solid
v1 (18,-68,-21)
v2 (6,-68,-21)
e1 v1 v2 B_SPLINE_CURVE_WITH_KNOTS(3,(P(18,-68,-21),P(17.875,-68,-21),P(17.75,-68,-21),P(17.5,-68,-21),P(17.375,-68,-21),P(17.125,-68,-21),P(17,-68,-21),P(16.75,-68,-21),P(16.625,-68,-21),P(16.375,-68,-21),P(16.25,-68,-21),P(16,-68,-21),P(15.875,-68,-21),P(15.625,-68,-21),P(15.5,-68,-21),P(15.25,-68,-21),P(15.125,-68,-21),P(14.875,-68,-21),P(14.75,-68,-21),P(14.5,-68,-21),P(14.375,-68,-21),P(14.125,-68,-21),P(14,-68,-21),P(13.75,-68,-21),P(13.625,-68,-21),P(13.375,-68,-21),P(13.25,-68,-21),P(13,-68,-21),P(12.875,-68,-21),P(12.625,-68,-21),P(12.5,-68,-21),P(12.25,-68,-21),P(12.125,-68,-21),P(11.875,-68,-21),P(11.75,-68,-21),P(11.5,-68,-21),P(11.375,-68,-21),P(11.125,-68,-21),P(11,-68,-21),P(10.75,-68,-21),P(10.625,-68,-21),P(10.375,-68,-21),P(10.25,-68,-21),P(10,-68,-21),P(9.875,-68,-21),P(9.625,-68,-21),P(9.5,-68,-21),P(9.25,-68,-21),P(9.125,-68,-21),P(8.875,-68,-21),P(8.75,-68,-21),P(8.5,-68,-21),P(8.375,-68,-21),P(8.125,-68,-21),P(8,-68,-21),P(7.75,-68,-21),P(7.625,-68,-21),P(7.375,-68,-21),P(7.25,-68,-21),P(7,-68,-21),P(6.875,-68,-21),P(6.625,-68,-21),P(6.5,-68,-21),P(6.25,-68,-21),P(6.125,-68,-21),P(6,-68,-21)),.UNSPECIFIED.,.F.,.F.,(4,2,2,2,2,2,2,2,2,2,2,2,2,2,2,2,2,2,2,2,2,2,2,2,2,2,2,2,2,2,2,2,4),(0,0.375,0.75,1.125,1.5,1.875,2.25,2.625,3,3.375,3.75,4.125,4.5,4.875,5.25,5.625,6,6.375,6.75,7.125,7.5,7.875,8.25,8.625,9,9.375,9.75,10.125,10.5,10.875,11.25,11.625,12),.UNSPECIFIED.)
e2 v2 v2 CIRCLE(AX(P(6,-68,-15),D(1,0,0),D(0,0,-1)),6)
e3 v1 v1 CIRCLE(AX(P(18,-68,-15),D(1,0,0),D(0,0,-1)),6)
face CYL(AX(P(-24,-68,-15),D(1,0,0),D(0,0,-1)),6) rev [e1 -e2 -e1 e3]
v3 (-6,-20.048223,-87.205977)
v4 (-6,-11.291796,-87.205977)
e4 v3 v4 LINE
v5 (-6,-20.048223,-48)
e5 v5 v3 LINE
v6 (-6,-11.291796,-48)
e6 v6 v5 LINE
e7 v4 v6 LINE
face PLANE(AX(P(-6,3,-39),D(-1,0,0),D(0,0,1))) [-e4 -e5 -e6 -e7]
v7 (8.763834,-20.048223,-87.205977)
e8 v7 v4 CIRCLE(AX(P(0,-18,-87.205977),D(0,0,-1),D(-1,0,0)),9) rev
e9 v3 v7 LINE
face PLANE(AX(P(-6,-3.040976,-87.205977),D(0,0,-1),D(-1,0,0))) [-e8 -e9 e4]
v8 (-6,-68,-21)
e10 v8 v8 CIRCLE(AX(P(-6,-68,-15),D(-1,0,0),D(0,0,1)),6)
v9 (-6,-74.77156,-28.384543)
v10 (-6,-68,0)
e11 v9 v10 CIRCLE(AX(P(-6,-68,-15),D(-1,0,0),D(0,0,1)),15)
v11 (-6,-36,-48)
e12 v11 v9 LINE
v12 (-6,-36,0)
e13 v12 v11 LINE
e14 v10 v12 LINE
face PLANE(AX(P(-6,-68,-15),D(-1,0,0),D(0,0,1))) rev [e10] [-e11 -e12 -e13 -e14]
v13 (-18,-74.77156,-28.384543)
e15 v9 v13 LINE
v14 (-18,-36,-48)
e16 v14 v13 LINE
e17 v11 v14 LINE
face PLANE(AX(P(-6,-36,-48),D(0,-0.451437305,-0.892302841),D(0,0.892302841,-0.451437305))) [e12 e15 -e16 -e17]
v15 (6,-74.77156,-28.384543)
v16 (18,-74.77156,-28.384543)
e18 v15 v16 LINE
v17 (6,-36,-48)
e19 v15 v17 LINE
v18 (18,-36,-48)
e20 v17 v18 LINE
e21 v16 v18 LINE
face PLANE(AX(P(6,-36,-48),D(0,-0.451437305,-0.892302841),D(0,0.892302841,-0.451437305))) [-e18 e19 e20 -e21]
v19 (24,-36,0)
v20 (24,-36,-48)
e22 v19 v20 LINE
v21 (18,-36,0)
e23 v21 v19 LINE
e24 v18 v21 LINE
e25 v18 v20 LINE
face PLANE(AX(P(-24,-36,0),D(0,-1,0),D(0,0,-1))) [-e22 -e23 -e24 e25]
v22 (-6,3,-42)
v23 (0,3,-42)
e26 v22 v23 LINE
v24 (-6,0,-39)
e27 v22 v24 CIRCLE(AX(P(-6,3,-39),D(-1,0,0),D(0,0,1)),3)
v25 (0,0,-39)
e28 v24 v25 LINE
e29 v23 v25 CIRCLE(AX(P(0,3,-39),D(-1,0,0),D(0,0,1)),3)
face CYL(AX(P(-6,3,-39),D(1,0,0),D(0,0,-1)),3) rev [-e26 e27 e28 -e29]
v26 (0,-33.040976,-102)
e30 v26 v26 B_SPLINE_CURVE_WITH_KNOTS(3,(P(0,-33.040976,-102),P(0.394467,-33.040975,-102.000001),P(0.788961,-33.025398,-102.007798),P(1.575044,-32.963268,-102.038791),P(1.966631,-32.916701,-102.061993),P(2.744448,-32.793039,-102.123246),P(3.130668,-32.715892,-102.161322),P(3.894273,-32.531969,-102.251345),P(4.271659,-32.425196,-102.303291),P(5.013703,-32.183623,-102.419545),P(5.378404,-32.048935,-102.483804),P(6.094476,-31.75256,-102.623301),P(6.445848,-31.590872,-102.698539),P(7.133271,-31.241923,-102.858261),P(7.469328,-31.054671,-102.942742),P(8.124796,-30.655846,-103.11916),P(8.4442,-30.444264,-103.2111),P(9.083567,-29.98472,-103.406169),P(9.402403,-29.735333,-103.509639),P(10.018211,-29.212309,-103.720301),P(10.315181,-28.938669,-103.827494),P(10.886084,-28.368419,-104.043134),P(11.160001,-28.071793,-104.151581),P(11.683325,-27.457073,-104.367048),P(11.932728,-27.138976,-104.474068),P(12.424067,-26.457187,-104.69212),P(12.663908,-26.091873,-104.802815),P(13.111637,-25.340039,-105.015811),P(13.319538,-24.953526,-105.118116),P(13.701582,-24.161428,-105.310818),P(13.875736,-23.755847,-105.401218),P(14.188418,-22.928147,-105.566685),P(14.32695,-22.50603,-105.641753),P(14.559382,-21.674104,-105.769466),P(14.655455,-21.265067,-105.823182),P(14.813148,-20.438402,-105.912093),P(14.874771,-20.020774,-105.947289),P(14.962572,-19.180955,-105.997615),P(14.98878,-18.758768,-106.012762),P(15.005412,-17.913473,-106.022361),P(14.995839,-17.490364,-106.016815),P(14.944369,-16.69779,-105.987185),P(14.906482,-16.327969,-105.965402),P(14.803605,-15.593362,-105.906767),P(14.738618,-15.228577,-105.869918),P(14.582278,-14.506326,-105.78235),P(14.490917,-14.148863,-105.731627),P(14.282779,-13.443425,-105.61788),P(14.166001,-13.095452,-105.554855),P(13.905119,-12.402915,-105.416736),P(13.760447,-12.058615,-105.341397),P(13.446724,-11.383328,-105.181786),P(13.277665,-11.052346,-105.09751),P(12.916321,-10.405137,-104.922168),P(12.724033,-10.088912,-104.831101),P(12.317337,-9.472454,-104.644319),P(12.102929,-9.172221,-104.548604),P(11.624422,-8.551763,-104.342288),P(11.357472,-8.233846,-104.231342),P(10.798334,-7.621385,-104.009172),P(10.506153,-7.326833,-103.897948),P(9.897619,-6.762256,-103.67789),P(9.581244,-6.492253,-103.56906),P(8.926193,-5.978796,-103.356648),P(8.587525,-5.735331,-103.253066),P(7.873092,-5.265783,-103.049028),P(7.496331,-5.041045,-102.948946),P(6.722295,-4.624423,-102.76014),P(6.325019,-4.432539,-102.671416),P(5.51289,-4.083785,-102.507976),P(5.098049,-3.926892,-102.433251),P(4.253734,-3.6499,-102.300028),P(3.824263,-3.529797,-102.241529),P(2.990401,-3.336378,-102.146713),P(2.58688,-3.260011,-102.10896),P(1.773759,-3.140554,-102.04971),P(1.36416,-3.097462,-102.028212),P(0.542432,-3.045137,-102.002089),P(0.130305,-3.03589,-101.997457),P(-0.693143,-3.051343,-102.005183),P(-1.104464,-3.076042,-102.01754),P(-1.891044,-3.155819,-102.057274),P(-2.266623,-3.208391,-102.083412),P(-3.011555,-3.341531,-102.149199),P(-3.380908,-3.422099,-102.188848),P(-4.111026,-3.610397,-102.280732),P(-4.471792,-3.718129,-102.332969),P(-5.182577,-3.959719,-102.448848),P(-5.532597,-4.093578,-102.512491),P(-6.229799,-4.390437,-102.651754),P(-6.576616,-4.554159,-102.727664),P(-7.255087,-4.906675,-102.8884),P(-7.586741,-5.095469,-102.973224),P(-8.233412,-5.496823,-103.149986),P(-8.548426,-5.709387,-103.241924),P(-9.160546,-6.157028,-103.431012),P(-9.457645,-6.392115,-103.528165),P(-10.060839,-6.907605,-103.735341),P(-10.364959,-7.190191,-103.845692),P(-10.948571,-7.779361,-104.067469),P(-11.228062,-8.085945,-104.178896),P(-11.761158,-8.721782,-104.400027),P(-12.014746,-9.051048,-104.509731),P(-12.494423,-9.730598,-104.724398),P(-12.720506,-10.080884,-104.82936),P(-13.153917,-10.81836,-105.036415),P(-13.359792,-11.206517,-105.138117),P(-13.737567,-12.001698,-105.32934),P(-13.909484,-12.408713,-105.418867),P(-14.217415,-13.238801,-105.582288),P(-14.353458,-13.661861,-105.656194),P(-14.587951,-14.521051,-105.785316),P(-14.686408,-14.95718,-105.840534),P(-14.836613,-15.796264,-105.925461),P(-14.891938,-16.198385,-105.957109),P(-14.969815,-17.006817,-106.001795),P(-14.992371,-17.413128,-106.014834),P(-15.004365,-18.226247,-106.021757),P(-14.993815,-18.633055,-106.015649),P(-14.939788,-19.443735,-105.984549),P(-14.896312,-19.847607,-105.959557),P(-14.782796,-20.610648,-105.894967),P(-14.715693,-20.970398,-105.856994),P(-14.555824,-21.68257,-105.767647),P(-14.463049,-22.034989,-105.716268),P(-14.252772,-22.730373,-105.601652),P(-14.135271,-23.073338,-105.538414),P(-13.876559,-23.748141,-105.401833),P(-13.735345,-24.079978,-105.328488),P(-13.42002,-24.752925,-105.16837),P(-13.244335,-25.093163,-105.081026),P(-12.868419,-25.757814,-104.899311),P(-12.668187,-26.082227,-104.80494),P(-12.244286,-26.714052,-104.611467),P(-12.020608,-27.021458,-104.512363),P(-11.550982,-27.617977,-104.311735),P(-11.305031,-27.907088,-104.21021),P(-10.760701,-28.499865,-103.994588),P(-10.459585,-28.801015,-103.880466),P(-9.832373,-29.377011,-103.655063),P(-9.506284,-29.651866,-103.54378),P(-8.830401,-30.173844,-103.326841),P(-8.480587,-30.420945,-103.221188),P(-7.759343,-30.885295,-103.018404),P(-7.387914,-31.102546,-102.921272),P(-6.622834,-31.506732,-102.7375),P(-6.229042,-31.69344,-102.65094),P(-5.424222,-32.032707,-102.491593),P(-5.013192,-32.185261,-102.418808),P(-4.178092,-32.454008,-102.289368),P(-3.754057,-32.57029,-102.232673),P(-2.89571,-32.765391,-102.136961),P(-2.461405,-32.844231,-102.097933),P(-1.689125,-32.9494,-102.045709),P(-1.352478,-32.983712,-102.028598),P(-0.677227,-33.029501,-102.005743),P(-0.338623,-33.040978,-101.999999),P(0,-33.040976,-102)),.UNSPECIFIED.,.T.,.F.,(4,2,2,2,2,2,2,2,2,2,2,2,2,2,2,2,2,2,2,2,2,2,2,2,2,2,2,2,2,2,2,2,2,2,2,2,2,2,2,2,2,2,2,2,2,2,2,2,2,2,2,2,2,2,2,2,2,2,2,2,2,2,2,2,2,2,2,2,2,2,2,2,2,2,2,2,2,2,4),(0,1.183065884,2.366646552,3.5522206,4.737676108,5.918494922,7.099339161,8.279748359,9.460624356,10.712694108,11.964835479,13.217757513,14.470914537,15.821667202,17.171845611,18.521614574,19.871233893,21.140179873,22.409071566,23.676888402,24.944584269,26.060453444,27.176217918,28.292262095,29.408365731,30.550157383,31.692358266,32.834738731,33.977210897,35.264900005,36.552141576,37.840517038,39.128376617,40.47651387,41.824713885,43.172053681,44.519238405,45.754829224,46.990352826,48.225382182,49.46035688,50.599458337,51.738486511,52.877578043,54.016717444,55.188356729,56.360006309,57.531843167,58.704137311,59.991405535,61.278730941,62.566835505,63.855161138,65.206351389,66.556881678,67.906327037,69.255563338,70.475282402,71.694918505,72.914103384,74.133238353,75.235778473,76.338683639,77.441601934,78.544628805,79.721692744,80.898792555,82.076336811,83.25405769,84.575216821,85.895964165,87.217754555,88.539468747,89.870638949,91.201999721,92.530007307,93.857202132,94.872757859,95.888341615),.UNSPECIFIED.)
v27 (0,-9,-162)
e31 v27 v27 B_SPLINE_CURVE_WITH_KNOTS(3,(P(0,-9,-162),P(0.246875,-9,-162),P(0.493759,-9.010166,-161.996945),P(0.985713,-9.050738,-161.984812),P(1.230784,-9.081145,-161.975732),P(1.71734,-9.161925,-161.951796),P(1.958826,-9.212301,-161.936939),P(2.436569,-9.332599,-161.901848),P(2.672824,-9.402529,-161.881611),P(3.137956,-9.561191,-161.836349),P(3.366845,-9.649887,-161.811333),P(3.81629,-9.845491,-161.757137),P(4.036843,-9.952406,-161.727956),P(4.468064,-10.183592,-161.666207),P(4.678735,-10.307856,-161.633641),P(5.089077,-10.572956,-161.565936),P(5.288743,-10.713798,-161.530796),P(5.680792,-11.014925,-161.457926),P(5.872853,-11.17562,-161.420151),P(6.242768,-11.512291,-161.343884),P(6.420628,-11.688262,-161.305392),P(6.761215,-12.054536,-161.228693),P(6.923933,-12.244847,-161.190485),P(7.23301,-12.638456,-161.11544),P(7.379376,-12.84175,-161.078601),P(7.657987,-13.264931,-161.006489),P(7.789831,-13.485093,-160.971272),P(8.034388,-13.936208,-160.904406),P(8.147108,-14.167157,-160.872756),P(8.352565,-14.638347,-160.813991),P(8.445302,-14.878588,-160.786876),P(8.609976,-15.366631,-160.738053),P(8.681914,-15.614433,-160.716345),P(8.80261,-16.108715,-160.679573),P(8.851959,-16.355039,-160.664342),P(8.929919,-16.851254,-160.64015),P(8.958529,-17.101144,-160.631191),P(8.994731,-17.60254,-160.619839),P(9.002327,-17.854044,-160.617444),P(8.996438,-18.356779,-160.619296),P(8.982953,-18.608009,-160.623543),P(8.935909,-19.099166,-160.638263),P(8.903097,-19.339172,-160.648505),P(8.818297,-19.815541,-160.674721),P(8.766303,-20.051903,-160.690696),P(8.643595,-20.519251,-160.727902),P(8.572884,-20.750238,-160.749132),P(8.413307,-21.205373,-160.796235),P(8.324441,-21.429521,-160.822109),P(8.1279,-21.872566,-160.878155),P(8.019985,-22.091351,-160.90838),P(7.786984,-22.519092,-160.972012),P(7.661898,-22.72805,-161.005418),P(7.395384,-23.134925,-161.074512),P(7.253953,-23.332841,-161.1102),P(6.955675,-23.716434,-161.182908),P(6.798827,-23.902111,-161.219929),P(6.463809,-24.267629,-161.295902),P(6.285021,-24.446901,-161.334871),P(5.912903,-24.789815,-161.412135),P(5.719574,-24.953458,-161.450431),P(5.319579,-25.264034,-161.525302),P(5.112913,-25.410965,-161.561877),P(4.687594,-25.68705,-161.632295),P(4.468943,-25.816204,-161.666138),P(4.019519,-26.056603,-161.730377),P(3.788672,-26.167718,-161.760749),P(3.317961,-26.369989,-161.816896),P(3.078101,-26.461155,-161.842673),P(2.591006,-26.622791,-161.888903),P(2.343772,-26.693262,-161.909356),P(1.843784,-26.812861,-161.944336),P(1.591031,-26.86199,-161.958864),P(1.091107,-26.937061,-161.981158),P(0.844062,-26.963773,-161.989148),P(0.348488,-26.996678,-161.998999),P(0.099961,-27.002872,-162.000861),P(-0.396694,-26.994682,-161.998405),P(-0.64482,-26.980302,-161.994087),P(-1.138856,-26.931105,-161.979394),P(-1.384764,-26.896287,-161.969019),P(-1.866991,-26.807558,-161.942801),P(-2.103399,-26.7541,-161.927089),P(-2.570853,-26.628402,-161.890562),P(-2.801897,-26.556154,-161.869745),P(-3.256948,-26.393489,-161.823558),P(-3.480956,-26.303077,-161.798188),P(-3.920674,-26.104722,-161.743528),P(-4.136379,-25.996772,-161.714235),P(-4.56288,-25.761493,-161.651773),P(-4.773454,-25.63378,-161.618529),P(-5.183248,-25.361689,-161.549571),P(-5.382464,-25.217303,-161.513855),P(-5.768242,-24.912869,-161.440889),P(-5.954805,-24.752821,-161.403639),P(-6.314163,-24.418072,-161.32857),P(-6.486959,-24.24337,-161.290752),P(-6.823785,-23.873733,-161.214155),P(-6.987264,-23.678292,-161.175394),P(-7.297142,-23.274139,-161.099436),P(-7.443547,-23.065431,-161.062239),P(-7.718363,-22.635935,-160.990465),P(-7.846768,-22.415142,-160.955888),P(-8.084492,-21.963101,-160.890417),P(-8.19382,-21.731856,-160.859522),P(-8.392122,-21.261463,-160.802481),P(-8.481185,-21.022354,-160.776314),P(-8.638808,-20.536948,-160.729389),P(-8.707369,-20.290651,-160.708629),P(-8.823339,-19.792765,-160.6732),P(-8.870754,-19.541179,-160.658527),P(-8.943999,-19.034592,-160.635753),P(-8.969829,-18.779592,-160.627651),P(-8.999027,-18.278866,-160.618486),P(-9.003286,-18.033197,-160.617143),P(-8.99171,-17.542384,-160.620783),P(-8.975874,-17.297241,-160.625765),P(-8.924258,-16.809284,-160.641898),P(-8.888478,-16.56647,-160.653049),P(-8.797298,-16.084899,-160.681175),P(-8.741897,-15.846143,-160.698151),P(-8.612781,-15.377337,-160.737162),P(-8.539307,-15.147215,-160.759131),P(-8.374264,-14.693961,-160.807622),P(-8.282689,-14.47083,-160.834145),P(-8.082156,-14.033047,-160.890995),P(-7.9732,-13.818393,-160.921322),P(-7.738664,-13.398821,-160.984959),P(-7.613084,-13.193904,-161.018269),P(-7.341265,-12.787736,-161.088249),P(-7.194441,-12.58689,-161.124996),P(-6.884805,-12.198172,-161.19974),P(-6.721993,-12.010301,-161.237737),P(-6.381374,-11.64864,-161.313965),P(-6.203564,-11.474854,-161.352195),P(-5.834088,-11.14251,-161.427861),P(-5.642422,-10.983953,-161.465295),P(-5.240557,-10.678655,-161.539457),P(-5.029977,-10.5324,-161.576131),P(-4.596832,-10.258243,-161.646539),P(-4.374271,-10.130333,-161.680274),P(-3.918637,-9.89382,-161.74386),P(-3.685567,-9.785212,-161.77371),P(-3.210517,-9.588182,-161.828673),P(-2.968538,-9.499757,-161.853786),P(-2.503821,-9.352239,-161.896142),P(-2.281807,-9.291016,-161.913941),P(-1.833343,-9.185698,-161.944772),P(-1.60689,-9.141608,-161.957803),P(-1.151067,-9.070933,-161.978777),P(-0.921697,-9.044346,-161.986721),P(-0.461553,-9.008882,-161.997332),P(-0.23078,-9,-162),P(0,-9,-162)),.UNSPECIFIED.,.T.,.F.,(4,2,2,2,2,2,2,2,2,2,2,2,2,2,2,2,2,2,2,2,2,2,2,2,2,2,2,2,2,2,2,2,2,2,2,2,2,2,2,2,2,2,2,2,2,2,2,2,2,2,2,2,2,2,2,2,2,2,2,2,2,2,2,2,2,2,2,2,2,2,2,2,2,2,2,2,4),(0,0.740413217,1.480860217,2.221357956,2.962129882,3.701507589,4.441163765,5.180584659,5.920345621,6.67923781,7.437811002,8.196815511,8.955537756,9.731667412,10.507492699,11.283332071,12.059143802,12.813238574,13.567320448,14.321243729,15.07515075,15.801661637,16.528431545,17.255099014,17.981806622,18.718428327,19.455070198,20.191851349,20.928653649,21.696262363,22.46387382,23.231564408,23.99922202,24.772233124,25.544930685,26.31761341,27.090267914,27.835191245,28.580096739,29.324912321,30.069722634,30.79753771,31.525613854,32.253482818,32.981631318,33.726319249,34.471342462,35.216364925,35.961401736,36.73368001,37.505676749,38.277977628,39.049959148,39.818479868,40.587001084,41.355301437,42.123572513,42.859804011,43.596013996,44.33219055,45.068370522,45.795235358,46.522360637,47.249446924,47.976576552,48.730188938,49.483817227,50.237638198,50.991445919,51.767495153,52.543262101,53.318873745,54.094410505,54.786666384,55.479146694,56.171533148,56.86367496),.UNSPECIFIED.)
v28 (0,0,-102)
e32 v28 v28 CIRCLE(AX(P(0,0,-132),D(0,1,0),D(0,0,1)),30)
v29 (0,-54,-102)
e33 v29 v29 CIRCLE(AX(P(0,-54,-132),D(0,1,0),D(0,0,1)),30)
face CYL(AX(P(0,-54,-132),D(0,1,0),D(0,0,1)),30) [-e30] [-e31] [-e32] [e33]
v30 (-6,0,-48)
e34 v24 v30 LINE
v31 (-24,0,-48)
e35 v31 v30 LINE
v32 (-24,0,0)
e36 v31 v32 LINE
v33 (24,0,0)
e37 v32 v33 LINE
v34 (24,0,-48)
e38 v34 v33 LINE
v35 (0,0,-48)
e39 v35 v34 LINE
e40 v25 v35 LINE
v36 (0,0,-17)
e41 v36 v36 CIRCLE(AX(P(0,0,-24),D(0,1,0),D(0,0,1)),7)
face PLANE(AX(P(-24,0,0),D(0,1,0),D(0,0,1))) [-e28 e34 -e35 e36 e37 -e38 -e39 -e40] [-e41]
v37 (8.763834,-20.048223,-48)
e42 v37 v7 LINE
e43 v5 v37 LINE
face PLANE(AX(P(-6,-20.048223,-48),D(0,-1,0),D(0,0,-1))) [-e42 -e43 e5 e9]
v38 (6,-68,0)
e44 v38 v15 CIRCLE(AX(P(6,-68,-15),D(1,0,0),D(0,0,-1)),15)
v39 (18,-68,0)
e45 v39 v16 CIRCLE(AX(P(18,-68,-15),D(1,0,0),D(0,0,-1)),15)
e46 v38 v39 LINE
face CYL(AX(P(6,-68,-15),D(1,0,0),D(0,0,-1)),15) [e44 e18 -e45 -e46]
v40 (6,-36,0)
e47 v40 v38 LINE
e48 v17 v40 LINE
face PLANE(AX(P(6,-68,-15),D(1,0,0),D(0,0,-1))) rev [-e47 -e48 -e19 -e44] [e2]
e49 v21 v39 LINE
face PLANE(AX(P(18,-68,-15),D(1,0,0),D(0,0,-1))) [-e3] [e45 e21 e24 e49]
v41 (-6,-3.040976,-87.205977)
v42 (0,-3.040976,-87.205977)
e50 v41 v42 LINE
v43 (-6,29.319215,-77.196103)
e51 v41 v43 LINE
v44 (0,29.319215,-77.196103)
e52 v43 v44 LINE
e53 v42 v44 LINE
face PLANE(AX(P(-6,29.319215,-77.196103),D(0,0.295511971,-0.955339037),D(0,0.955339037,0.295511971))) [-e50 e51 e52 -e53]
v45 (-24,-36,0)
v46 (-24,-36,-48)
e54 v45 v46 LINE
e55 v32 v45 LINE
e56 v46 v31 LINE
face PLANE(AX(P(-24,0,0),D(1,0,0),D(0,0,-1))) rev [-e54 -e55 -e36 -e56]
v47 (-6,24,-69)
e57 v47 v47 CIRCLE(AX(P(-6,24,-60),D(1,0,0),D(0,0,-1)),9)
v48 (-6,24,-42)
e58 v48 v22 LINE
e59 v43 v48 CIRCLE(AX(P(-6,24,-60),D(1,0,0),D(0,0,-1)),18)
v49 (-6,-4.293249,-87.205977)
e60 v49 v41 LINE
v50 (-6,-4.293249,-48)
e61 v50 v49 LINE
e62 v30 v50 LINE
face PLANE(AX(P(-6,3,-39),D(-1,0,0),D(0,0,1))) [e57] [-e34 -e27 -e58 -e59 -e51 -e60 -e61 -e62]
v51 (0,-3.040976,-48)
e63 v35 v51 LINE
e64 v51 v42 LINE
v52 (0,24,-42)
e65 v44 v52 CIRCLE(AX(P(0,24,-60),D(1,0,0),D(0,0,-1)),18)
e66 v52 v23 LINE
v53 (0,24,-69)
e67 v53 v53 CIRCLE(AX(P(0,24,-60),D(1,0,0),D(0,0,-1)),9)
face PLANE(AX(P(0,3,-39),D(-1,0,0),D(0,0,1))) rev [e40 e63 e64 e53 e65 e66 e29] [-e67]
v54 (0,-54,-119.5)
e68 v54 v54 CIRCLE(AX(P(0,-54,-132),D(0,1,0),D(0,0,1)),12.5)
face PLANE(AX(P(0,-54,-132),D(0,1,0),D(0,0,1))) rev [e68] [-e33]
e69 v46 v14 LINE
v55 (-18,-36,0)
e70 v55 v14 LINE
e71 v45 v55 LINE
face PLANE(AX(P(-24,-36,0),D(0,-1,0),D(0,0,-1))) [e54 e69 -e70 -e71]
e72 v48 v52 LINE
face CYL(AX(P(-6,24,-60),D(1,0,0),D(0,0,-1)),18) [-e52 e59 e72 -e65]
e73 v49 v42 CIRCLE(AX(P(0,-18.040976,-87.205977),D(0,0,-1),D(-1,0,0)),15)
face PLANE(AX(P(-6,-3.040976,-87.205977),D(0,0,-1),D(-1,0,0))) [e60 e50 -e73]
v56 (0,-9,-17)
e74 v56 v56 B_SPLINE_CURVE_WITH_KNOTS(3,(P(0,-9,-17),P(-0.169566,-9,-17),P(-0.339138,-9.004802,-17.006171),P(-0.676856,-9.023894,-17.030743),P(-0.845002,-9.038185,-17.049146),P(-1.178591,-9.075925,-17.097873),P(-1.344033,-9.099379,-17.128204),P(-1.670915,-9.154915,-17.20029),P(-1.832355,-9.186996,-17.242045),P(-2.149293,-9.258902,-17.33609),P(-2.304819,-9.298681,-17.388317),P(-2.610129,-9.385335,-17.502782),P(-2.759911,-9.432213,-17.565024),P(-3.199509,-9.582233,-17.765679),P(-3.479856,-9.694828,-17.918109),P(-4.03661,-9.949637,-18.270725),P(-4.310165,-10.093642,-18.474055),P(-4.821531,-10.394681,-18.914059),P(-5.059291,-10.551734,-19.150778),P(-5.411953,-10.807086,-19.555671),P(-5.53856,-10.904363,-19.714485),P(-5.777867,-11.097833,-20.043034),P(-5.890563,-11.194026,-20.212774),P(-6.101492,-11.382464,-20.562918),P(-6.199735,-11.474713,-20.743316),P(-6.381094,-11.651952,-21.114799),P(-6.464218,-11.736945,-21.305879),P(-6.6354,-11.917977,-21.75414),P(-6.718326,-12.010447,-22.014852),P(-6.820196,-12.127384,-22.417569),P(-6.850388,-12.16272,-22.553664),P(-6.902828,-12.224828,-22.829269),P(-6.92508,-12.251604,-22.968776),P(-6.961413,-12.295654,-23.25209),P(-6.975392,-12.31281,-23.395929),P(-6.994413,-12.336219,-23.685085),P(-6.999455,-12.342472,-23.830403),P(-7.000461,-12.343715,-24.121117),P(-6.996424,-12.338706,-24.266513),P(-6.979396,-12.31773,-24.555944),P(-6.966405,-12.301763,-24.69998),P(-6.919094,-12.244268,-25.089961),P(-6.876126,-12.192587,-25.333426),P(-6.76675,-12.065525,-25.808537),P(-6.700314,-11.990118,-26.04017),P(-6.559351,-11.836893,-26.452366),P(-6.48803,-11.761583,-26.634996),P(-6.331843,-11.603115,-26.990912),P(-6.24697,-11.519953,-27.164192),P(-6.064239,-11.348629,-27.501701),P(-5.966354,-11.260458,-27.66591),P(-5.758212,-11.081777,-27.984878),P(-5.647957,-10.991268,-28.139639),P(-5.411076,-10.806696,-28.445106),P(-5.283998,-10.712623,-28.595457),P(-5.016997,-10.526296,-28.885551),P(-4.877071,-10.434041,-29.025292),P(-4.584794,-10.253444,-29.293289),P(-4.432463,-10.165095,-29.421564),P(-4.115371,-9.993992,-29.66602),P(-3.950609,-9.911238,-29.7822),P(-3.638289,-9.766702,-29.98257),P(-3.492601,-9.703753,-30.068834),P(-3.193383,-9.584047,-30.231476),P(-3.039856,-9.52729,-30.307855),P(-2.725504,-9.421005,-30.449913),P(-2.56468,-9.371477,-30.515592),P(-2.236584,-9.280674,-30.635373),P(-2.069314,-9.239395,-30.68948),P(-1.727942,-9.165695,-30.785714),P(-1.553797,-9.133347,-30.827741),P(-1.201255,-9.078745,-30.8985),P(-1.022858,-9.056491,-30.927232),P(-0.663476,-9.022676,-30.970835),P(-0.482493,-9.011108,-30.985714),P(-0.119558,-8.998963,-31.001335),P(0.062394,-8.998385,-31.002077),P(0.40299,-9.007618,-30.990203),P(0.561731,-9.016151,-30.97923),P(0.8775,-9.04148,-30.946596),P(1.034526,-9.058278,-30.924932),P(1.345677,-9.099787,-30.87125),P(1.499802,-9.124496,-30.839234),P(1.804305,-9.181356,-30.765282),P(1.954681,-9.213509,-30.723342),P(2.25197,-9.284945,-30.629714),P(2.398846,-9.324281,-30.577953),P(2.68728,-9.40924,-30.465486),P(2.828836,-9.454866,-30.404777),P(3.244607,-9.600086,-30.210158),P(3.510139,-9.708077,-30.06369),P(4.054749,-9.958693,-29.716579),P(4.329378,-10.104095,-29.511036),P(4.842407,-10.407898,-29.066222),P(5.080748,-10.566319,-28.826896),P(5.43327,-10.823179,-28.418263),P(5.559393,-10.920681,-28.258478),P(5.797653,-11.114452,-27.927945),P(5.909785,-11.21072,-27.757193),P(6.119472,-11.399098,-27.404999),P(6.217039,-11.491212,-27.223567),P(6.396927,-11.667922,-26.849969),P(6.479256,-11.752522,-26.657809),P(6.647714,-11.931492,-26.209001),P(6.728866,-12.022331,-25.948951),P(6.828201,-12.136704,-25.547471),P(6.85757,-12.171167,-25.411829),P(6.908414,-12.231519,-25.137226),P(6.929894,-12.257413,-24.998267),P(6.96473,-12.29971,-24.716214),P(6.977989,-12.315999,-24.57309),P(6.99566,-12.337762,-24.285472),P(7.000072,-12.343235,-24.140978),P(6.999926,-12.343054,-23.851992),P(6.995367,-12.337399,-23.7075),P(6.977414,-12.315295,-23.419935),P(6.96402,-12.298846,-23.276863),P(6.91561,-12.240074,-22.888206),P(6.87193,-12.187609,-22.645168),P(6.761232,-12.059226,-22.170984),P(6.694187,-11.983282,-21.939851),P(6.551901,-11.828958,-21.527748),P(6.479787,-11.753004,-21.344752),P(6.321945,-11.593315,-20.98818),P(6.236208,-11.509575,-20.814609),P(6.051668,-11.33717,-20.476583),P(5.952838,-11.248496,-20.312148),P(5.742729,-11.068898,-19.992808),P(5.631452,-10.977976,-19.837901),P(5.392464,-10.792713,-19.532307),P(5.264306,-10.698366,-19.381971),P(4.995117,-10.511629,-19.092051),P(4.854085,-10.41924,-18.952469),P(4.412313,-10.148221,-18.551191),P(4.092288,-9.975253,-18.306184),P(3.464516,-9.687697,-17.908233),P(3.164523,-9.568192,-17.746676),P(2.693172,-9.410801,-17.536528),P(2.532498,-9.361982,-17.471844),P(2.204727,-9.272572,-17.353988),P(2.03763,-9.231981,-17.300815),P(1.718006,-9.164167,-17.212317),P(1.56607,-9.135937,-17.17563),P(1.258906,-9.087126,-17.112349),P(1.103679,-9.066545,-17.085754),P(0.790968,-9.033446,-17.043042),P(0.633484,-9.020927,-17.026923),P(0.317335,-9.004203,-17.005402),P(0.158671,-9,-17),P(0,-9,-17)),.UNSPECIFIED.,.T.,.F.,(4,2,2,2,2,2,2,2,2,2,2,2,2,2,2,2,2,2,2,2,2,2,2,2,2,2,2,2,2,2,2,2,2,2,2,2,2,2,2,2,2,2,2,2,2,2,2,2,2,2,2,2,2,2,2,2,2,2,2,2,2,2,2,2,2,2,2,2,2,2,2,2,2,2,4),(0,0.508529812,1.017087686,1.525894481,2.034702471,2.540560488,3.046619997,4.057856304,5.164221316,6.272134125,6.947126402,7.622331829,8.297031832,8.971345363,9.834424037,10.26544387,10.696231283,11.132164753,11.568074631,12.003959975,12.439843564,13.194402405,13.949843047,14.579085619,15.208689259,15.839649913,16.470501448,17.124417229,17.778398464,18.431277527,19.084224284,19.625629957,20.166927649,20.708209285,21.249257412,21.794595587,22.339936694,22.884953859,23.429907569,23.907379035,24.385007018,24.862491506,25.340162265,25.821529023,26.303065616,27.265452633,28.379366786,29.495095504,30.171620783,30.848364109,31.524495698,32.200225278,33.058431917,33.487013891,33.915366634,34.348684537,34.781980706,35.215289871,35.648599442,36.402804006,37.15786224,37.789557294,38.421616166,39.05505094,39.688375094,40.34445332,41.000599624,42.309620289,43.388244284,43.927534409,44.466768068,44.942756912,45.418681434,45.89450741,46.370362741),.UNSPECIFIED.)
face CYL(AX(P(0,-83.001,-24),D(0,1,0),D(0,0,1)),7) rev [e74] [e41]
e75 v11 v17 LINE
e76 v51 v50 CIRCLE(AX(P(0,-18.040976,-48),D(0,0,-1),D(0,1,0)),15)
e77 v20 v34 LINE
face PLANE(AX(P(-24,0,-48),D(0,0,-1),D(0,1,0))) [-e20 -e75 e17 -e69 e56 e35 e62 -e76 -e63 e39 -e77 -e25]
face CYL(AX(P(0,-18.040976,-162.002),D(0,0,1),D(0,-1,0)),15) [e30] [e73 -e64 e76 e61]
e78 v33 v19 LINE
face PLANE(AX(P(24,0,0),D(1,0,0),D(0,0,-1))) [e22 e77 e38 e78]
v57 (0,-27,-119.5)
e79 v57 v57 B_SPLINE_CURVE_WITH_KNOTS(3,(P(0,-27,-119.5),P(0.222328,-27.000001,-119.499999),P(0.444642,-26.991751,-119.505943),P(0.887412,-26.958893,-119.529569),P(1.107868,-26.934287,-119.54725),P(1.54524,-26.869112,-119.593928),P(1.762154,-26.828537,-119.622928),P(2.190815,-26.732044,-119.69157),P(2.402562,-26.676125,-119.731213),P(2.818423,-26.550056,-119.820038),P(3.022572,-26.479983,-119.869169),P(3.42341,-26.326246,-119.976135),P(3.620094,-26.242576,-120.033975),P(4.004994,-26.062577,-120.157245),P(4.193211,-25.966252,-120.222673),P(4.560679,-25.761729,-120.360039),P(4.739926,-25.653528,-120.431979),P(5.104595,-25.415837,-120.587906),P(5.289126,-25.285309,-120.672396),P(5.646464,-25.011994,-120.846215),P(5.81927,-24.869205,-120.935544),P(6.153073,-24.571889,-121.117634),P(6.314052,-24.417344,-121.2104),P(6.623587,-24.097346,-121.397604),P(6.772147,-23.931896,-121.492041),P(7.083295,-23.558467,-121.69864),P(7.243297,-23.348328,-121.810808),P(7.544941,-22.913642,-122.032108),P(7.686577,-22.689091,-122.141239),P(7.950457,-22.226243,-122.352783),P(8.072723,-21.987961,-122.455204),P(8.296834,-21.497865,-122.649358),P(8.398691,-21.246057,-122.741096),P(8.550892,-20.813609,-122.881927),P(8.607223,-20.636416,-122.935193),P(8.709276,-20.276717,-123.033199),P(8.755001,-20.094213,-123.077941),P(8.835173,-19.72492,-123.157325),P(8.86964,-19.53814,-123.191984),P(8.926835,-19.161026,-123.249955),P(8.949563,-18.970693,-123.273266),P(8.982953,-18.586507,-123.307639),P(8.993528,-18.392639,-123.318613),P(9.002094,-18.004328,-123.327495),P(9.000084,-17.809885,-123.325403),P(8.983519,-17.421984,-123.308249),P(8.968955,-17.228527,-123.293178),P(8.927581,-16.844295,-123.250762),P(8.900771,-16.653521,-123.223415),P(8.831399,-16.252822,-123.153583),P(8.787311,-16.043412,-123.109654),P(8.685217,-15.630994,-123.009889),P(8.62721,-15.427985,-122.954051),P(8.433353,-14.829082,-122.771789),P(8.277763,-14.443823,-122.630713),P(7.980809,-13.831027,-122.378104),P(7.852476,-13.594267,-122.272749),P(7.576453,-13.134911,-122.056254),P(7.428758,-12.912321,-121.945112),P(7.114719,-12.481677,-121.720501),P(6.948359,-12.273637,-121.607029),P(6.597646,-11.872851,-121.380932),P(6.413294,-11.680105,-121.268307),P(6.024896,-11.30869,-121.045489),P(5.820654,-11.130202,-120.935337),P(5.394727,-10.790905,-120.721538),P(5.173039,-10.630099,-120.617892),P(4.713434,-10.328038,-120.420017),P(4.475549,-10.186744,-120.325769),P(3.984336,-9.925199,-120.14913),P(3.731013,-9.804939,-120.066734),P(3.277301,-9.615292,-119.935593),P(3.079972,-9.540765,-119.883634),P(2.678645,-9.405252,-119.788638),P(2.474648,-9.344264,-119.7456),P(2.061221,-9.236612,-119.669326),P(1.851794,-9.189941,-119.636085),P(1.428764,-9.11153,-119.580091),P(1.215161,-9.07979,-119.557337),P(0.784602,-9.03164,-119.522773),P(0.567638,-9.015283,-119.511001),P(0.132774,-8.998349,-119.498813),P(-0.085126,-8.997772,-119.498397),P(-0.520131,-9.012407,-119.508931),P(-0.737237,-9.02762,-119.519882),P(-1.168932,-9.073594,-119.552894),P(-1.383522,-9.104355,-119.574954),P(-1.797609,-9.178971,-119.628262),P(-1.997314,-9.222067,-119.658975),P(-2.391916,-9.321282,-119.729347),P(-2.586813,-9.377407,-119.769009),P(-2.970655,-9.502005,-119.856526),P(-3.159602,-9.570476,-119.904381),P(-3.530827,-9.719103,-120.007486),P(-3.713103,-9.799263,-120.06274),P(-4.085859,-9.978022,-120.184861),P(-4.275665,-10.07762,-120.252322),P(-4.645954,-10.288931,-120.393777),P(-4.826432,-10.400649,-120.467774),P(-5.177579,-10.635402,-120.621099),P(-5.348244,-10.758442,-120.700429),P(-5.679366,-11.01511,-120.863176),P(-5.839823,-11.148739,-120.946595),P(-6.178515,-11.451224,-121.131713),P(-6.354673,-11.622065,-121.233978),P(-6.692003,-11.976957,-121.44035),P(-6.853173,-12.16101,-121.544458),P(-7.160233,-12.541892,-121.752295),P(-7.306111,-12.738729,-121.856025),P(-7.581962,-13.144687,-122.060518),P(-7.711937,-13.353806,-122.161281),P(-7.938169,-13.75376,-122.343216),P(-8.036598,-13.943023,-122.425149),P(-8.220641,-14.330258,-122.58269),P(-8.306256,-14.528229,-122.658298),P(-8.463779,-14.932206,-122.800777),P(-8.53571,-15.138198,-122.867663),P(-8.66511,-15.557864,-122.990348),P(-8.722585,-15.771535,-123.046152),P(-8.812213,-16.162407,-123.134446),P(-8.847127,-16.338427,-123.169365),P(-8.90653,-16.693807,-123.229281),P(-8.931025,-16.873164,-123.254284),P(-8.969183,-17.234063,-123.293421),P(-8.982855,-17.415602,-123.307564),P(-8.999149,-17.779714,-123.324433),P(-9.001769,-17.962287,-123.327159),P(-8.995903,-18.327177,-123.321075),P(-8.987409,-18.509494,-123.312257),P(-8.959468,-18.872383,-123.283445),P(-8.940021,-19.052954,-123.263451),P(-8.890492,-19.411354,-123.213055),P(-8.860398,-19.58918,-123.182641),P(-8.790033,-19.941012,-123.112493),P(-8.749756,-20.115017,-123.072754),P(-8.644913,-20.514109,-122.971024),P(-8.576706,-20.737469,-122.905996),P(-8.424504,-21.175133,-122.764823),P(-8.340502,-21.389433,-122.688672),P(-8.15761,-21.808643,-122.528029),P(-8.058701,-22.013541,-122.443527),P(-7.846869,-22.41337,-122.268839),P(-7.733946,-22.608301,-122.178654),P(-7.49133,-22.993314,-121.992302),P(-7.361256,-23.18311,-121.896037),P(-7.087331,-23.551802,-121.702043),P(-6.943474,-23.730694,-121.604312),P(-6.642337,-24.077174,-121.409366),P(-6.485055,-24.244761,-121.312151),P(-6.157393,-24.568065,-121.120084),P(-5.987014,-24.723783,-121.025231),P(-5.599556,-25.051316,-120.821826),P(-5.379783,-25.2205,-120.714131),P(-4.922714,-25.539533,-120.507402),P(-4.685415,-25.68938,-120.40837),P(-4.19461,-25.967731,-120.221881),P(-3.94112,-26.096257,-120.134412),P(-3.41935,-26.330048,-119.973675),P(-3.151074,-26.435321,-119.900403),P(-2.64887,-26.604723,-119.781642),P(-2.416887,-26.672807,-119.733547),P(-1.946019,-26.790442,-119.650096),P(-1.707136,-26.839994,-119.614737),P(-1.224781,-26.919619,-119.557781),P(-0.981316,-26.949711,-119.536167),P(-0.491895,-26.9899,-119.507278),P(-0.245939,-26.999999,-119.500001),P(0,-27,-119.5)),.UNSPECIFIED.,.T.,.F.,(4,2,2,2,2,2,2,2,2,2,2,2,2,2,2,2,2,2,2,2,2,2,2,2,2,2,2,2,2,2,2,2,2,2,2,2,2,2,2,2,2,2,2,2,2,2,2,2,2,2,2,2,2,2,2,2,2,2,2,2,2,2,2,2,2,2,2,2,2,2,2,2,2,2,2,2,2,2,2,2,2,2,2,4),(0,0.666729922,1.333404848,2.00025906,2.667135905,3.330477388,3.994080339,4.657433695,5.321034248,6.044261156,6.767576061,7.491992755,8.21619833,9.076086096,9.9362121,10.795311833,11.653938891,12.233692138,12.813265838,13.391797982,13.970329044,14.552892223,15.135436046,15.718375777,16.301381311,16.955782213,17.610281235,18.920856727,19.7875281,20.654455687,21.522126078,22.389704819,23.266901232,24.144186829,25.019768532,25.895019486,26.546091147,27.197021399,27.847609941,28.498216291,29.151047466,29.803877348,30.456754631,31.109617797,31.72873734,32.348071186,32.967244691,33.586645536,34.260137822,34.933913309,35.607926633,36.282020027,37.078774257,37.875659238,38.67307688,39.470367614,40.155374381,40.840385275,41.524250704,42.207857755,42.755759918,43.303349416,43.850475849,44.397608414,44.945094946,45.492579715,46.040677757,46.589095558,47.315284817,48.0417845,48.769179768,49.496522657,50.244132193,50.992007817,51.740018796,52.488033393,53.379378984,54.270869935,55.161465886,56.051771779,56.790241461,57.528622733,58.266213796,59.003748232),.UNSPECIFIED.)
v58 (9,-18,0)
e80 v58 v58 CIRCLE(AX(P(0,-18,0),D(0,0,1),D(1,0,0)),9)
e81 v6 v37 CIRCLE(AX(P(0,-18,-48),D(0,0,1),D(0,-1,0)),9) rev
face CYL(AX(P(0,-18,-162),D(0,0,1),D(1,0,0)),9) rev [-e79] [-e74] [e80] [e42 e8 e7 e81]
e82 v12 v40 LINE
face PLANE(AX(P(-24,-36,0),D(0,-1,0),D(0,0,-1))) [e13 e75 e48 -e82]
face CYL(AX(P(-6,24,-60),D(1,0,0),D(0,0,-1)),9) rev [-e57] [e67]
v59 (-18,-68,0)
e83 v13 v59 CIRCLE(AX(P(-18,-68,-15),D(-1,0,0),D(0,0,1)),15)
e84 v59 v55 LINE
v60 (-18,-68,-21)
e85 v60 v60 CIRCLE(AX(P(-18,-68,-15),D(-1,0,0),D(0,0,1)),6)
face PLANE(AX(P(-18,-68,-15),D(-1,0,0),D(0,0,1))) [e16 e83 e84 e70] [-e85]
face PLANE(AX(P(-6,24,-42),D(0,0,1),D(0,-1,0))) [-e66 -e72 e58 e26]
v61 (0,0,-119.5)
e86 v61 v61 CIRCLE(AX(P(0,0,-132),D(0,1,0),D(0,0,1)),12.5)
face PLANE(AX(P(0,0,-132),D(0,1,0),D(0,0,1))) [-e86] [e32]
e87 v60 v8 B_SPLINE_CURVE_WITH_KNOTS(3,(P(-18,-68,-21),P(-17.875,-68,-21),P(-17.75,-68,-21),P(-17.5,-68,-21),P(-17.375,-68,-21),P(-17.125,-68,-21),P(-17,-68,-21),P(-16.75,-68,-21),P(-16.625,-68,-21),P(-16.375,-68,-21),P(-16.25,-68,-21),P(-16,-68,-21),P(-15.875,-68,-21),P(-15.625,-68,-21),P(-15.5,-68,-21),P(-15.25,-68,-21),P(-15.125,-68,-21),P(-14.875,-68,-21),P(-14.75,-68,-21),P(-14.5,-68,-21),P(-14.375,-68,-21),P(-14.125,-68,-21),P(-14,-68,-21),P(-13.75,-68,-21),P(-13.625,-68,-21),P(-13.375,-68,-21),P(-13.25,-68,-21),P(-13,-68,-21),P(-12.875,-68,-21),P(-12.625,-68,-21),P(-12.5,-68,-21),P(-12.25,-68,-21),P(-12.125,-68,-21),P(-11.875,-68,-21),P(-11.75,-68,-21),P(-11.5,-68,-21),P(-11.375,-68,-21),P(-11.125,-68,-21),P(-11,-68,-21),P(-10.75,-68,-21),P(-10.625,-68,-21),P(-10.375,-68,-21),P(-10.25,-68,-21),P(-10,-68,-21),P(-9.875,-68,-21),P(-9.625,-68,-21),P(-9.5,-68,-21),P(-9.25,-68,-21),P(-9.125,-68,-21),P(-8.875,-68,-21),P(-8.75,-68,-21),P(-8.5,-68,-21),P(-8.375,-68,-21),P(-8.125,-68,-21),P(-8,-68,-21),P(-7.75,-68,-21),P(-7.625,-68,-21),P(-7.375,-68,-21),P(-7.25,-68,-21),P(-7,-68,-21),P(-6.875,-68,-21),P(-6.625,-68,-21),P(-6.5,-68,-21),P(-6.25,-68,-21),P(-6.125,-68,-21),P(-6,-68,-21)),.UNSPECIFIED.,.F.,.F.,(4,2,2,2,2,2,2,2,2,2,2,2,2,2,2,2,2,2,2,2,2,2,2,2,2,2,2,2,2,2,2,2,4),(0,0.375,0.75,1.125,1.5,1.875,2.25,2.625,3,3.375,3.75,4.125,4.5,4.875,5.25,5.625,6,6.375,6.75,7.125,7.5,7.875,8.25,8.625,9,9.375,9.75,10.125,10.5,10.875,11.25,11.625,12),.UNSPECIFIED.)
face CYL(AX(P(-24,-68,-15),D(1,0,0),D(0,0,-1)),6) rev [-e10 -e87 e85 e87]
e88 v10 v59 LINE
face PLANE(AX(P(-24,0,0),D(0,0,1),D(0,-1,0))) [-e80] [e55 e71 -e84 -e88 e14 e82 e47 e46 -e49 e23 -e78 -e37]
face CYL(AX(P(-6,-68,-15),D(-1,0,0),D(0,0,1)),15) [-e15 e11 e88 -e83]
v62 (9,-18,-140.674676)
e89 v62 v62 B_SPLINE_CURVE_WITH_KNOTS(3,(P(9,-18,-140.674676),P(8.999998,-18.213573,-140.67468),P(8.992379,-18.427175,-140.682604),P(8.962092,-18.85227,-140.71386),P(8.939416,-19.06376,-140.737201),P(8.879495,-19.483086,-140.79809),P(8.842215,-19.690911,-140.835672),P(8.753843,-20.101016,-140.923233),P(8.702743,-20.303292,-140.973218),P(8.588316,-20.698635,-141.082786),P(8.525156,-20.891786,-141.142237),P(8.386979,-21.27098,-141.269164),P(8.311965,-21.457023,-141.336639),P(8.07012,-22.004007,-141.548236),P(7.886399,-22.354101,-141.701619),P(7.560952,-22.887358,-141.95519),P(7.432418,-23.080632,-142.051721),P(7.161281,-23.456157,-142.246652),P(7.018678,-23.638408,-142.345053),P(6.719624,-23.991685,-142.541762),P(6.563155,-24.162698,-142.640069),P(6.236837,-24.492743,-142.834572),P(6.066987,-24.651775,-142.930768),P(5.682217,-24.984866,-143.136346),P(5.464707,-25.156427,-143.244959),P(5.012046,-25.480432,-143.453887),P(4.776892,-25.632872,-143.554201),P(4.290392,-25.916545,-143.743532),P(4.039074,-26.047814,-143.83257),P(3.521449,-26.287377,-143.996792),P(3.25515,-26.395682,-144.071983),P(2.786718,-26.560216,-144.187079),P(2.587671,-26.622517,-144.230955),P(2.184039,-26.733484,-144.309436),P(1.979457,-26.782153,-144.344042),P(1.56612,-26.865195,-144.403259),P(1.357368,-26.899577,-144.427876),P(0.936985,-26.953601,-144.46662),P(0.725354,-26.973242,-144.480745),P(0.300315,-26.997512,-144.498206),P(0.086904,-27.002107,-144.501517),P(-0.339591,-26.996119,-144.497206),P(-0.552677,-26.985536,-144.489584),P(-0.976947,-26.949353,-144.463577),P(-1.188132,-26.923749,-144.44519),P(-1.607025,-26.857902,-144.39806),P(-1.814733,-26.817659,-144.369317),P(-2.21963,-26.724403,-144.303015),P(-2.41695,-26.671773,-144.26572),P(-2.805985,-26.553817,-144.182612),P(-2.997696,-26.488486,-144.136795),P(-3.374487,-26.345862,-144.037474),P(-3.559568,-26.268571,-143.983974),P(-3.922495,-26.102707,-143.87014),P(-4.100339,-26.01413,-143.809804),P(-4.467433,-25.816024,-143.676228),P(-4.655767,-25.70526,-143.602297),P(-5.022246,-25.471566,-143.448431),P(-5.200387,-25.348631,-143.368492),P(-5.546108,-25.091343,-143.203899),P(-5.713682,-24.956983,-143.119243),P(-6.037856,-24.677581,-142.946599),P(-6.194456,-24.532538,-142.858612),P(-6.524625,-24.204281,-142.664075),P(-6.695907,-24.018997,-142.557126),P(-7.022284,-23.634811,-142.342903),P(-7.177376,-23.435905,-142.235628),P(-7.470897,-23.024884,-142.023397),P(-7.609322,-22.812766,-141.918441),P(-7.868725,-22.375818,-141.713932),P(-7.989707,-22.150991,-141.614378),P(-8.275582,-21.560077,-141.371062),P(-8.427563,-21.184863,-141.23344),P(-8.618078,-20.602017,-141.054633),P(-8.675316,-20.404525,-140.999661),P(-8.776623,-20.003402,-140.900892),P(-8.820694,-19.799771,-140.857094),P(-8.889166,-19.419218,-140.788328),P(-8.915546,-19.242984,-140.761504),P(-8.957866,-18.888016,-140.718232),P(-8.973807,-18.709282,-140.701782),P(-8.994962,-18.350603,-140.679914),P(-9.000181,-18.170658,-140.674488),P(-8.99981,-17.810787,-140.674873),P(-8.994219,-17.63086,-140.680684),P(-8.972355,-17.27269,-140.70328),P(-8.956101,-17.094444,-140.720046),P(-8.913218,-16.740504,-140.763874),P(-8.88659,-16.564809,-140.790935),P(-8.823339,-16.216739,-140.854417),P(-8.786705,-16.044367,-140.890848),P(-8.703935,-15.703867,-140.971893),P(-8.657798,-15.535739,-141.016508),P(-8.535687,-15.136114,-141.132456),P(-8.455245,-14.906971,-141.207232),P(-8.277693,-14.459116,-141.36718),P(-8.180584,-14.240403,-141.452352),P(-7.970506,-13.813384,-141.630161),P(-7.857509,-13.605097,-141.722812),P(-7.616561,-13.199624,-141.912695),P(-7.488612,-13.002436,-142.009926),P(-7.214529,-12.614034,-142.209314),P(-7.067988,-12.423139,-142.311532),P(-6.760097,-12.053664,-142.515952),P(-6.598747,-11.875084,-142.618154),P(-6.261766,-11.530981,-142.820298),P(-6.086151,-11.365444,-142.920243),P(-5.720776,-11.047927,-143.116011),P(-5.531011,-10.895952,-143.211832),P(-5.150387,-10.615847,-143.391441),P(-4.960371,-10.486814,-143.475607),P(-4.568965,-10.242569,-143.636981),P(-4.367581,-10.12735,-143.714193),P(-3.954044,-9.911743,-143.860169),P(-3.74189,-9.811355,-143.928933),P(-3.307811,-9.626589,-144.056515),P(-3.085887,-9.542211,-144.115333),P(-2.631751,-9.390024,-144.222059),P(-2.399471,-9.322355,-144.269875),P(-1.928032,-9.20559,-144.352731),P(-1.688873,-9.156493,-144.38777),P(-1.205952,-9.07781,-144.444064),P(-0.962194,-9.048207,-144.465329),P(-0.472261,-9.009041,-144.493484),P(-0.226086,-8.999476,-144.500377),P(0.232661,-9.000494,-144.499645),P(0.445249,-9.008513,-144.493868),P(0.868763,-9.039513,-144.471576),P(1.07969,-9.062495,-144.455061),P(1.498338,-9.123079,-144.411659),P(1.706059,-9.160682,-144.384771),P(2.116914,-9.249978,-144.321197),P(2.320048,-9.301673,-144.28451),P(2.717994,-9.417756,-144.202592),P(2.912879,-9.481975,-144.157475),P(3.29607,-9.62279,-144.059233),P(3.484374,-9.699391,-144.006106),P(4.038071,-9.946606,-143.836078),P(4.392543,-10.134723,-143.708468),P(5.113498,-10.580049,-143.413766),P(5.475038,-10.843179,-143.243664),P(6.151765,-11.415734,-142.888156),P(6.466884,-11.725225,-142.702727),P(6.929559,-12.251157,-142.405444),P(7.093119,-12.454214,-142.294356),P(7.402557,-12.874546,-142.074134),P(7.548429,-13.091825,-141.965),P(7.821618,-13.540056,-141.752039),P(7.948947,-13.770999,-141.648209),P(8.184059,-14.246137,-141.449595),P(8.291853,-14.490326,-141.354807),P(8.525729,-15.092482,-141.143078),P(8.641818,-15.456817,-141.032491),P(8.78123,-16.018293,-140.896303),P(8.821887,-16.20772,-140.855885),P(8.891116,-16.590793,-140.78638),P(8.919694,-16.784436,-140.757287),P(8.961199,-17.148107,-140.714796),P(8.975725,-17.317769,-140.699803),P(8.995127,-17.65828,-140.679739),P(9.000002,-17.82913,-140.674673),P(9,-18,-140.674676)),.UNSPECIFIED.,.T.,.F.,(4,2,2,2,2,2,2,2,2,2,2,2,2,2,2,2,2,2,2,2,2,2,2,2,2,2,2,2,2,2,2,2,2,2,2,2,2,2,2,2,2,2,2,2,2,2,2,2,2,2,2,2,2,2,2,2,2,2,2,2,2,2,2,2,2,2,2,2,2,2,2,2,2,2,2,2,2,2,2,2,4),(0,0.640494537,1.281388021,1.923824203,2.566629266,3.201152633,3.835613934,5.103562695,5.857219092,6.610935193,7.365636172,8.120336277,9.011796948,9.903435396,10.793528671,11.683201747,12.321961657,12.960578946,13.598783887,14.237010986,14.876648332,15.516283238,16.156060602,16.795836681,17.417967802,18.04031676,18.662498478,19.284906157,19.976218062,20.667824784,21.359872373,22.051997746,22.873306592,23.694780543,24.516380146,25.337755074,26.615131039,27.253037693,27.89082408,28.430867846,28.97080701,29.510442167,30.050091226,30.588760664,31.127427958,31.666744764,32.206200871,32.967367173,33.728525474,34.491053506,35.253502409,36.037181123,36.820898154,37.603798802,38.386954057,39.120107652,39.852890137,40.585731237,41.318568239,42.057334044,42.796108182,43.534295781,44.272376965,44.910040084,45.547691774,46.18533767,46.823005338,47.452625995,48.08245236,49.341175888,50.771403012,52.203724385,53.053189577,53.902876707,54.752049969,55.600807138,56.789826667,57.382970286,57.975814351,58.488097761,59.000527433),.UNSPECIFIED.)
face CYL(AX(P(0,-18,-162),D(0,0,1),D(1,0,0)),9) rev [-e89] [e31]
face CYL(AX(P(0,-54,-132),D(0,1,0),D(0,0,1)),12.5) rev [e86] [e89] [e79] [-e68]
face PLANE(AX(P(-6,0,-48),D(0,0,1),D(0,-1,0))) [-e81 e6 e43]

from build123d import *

# Parameters (mm, degrees)
BOSS_EXTRUDE1_DEPTH       = 24
BOSS_EXTRUDE1_DEPTH_BACK  = 24
SKETCH1_W                 = 48
SKETCH1_H                 = 36
BOSS_EXTRUDE2_DEPTH       = 12
BOSS_EXTRUDE3_START       = -12
BOSS_EXTRUDE3_DEPTH       = 12
SKETCH7_R                 = 6
CUT_EXTRUDE1_DEPTH        = 105.675689632
SKETCH9_R                 = 30
SKETCH9_R_2               = 12.5
BOSS_EXTRUDE4_DEPTH       = 54
BOSS_EXTRUDE5_REACH       = 146.17
BOSS_EXTRUDE5_END_RADIUS  = 30
SKETCH10_R                = 15
SKETCH11_R                = 9
CUT_EXTRUDE2_DEPTH        = 185.480351361
BOSS_EXTRUDE6_START       = -87.205977382
BOSS_EXTRUDE6_DEPTH       = 39.205977382
BOSS_EXTRUDE6_START_2     = -77.335756752
BOSS_EXTRUDE6_2_DEPTH     = 29.335756752
BOSS_EXTRUDE6_START_3     = -6
BOSS_EXTRUDE6_3_OUTLINE_R = 9
BOSS_EXTRUDE6_3_DEPTH     = 6
CUT_EXTRUDE3_REACH        = 186.48
CUT_EXTRUDE3_END_RADIUS   = 9
SKETCH13_R                = 7


with BuildPart() as part:
    # Sketch1 → Boss-Extrude1 (new, two sides: drawn at the far end of the back side and taken through both)
    with BuildSketch(Plane(origin=(0, 0, 0), x_dir=(0, 0, -1), z_dir=(1, 0, 0)).offset(-BOSS_EXTRUDE1_DEPTH_BACK)):
        with Locations((24, -18)):
            Rectangle(SKETCH1_W, SKETCH1_H)
    extrude(amount=BOSS_EXTRUDE1_DEPTH + BOSS_EXTRUDE1_DEPTH_BACK)

    # Sketch2 → Boss-Extrude2 (add)
    with BuildSketch(Plane(origin=(18, 0, 0), x_dir=(0, 0, -1), z_dir=(1, 0, 0))):
        with BuildLine():
            Line((0, -36), (0, -68))
            ThreePointArc((0, -68), (11.519205494, -82.590547269), (28.384542614, -74.771559571))
            Line((28.384542614, -74.771559571), (48, -36))
            Line((48, -36), (0, -36))
        make_face()
    extrude(amount=-BOSS_EXTRUDE2_DEPTH)

    # Sketch6 → Boss-Extrude3 (add)
    with BuildSketch(Plane.ZY.offset(18).offset(BOSS_EXTRUDE3_START)):
        with BuildLine():
            Line((0, -36), (0, -68))
            ThreePointArc((0, -68), (-11.519205494, -82.590547269), (-28.384542614, -74.771559571))
            Line((-28.384542614, -74.771559571), (-48, -36))
            Line((-48, -36), (-48, 0))
            Line((-48, 0), (0, 0))
            Line((0, 0), (0, -36))
        make_face()
    extrude(amount=BOSS_EXTRUDE3_DEPTH)

    # Sketch7 → Cut-Extrude1 (cut, through all)
    with BuildSketch(Plane(origin=(18, 0, 0), x_dir=(0, 0, -1), z_dir=(1, 0, 0))):
        with Locations((15, -68)):
            Circle(SKETCH7_R)
    extrude(amount=-CUT_EXTRUDE1_DEPTH, mode=Mode.SUBTRACT)



with BuildPart() as body_2:
    # Sketch9 → Boss-Extrude4 (new body)
    with BuildSketch(Plane(origin=(0, 0, 0), x_dir=(1, 0, 0), z_dir=(0, 1, 0))):
        with Locations(Location((0, 132, 0), (0, 0, 270))):
            Circle(SKETCH9_R)
        with Locations(Location((0, 132, 0), (0, 0, 270))):
            Circle(SKETCH9_R_2, mode=Mode.SUBTRACT)
    extrude(amount=-BOSS_EXTRUDE4_DEPTH)


with BuildPart() as part_1:
    add(part.part)

    add(body_2.part)  # Boss-Extrude5 merges body 2
    # Boss-Extrude5: up to this cylinder (the profile starts outside it)
    boss_extrude5_end = Plane(origin=(0, -18.040976, -132), z_dir=(0, 1, 0)) * Cylinder(BOSS_EXTRUDE5_END_RADIUS, 353.34, mode=Mode.PRIVATE)
    # Sketch10 → Boss-Extrude5 (add, up to the surface)
    with BuildSketch(Plane(origin=(0, 0, -48), x_dir=(-1, 0, 0), z_dir=(0, 0, -1)), mode=Mode.PRIVATE) as boss_extrude5_sk1:
        with Locations(Location((0, -18.040976412, 0), (0, 0, 270))):
            Circle(SKETCH10_R)
    boss_extrude5_tool1 = extrude(boss_extrude5_sk1.sketch, amount=BOSS_EXTRUDE5_REACH, mode=Mode.PRIVATE) - boss_extrude5_end
    add(boss_extrude5_tool1.solids().sort_by_distance((0, -18.040976, -48))[0])

    # Sketch11 → Cut-Extrude2 (cut, through all)
    with BuildSketch(Plane.XY):
        with Locations((0, -18)):
            Circle(SKETCH11_R)
    extrude(amount=-CUT_EXTRUDE2_DEPTH, mode=Mode.SUBTRACT)

    # Boss-Extrude6: read off the stored shape, not the designer's step
    # Boss-Extrude6 outline → Boss-Extrude6 (add)
    with BuildSketch(Plane.XY.offset(BOSS_EXTRUDE6_START)):
        with BuildLine():
            ThreePointArc((8.763833852, -20.048222698), (4.591126901, -10.259098646), (-6, -11.291796068))
            Line((-6, -11.291796068), (-6, -20.048222698))
            Line((-6, -20.048222698), (8.763833852, -20.048222698))
        make_face()
    extrude(amount=BOSS_EXTRUDE6_DEPTH)

    # Boss-Extrude6 2 outline → Boss-Extrude6 2 (add)
    with BuildSketch(Plane.XY.offset(BOSS_EXTRUDE6_START_2)):
        with BuildLine():
            Line((0, 0), (-6, 0))
            Line((-6, 0), (-6, -4.293249327))
            ThreePointArc((-6, -4.293249327), (-3.064644655, -3.357381718), (0, -3.040976412))
            Line((0, -3.040976412), (0, 0))
        make_face()
    extrude(amount=BOSS_EXTRUDE6_2_DEPTH)

    # Boss-Extrude6 3 outline → Boss-Extrude6 3 (add)
    with BuildSketch(Plane.YZ.offset(BOSS_EXTRUDE6_START_3)):
        with BuildLine():
            Line((-6, -87.205977382), (-3.040976412, -87.205977382))
            Line((-3.040976412, -87.205977382), (29.319215471, -77.196102662))
            ThreePointArc((29.319215471, -77.196102662), (41.797890998, -57.310190334), (24, -42))
            Line((24, -42), (3, -42))
            ThreePointArc((3, -42), (0.878679656, -41.121320344), (0, -39))
            Line((0, -39), (0, -77.335756752))
            Line((0, -77.335756752), (-6, -77.335756752))
            Line((-6, -77.335756752), (-6, -87.205977382))
        make_face()
        with Locations((24, -60)):
            Circle(BOSS_EXTRUDE6_3_OUTLINE_R, mode=Mode.SUBTRACT)
    extrude(amount=BOSS_EXTRUDE6_3_DEPTH)

    # Cut-Extrude3: up to this cylinder (the profile starts outside it)
    cut_extrude3_end = Plane(origin=(0, -18, -24), z_dir=(0, 0, 1)) * Cylinder(CUT_EXTRUDE3_END_RADIUS, 391.96, mode=Mode.PRIVATE)
    # Sketch13 → Cut-Extrude3 (cut, up to the surface)
    with BuildSketch(Plane(origin=(0, 0, 0), x_dir=(1, 0, 0), z_dir=(0, 1, 0)), mode=Mode.PRIVATE) as cut_extrude3_sk1:
        with Locations(Location((0, 24, 0), (0, 0, 270))):
            Circle(SKETCH13_R)
    cut_extrude3_tool1 = extrude(cut_extrude3_sk1.sketch, amount=-CUT_EXTRUDE3_REACH, mode=Mode.PRIVATE) - cut_extrude3_end
    add(cut_extrude3_tool1.solids().sort_by_distance((0, 0, -24))[0], mode=Mode.SUBTRACT)


solid = part_1.part
